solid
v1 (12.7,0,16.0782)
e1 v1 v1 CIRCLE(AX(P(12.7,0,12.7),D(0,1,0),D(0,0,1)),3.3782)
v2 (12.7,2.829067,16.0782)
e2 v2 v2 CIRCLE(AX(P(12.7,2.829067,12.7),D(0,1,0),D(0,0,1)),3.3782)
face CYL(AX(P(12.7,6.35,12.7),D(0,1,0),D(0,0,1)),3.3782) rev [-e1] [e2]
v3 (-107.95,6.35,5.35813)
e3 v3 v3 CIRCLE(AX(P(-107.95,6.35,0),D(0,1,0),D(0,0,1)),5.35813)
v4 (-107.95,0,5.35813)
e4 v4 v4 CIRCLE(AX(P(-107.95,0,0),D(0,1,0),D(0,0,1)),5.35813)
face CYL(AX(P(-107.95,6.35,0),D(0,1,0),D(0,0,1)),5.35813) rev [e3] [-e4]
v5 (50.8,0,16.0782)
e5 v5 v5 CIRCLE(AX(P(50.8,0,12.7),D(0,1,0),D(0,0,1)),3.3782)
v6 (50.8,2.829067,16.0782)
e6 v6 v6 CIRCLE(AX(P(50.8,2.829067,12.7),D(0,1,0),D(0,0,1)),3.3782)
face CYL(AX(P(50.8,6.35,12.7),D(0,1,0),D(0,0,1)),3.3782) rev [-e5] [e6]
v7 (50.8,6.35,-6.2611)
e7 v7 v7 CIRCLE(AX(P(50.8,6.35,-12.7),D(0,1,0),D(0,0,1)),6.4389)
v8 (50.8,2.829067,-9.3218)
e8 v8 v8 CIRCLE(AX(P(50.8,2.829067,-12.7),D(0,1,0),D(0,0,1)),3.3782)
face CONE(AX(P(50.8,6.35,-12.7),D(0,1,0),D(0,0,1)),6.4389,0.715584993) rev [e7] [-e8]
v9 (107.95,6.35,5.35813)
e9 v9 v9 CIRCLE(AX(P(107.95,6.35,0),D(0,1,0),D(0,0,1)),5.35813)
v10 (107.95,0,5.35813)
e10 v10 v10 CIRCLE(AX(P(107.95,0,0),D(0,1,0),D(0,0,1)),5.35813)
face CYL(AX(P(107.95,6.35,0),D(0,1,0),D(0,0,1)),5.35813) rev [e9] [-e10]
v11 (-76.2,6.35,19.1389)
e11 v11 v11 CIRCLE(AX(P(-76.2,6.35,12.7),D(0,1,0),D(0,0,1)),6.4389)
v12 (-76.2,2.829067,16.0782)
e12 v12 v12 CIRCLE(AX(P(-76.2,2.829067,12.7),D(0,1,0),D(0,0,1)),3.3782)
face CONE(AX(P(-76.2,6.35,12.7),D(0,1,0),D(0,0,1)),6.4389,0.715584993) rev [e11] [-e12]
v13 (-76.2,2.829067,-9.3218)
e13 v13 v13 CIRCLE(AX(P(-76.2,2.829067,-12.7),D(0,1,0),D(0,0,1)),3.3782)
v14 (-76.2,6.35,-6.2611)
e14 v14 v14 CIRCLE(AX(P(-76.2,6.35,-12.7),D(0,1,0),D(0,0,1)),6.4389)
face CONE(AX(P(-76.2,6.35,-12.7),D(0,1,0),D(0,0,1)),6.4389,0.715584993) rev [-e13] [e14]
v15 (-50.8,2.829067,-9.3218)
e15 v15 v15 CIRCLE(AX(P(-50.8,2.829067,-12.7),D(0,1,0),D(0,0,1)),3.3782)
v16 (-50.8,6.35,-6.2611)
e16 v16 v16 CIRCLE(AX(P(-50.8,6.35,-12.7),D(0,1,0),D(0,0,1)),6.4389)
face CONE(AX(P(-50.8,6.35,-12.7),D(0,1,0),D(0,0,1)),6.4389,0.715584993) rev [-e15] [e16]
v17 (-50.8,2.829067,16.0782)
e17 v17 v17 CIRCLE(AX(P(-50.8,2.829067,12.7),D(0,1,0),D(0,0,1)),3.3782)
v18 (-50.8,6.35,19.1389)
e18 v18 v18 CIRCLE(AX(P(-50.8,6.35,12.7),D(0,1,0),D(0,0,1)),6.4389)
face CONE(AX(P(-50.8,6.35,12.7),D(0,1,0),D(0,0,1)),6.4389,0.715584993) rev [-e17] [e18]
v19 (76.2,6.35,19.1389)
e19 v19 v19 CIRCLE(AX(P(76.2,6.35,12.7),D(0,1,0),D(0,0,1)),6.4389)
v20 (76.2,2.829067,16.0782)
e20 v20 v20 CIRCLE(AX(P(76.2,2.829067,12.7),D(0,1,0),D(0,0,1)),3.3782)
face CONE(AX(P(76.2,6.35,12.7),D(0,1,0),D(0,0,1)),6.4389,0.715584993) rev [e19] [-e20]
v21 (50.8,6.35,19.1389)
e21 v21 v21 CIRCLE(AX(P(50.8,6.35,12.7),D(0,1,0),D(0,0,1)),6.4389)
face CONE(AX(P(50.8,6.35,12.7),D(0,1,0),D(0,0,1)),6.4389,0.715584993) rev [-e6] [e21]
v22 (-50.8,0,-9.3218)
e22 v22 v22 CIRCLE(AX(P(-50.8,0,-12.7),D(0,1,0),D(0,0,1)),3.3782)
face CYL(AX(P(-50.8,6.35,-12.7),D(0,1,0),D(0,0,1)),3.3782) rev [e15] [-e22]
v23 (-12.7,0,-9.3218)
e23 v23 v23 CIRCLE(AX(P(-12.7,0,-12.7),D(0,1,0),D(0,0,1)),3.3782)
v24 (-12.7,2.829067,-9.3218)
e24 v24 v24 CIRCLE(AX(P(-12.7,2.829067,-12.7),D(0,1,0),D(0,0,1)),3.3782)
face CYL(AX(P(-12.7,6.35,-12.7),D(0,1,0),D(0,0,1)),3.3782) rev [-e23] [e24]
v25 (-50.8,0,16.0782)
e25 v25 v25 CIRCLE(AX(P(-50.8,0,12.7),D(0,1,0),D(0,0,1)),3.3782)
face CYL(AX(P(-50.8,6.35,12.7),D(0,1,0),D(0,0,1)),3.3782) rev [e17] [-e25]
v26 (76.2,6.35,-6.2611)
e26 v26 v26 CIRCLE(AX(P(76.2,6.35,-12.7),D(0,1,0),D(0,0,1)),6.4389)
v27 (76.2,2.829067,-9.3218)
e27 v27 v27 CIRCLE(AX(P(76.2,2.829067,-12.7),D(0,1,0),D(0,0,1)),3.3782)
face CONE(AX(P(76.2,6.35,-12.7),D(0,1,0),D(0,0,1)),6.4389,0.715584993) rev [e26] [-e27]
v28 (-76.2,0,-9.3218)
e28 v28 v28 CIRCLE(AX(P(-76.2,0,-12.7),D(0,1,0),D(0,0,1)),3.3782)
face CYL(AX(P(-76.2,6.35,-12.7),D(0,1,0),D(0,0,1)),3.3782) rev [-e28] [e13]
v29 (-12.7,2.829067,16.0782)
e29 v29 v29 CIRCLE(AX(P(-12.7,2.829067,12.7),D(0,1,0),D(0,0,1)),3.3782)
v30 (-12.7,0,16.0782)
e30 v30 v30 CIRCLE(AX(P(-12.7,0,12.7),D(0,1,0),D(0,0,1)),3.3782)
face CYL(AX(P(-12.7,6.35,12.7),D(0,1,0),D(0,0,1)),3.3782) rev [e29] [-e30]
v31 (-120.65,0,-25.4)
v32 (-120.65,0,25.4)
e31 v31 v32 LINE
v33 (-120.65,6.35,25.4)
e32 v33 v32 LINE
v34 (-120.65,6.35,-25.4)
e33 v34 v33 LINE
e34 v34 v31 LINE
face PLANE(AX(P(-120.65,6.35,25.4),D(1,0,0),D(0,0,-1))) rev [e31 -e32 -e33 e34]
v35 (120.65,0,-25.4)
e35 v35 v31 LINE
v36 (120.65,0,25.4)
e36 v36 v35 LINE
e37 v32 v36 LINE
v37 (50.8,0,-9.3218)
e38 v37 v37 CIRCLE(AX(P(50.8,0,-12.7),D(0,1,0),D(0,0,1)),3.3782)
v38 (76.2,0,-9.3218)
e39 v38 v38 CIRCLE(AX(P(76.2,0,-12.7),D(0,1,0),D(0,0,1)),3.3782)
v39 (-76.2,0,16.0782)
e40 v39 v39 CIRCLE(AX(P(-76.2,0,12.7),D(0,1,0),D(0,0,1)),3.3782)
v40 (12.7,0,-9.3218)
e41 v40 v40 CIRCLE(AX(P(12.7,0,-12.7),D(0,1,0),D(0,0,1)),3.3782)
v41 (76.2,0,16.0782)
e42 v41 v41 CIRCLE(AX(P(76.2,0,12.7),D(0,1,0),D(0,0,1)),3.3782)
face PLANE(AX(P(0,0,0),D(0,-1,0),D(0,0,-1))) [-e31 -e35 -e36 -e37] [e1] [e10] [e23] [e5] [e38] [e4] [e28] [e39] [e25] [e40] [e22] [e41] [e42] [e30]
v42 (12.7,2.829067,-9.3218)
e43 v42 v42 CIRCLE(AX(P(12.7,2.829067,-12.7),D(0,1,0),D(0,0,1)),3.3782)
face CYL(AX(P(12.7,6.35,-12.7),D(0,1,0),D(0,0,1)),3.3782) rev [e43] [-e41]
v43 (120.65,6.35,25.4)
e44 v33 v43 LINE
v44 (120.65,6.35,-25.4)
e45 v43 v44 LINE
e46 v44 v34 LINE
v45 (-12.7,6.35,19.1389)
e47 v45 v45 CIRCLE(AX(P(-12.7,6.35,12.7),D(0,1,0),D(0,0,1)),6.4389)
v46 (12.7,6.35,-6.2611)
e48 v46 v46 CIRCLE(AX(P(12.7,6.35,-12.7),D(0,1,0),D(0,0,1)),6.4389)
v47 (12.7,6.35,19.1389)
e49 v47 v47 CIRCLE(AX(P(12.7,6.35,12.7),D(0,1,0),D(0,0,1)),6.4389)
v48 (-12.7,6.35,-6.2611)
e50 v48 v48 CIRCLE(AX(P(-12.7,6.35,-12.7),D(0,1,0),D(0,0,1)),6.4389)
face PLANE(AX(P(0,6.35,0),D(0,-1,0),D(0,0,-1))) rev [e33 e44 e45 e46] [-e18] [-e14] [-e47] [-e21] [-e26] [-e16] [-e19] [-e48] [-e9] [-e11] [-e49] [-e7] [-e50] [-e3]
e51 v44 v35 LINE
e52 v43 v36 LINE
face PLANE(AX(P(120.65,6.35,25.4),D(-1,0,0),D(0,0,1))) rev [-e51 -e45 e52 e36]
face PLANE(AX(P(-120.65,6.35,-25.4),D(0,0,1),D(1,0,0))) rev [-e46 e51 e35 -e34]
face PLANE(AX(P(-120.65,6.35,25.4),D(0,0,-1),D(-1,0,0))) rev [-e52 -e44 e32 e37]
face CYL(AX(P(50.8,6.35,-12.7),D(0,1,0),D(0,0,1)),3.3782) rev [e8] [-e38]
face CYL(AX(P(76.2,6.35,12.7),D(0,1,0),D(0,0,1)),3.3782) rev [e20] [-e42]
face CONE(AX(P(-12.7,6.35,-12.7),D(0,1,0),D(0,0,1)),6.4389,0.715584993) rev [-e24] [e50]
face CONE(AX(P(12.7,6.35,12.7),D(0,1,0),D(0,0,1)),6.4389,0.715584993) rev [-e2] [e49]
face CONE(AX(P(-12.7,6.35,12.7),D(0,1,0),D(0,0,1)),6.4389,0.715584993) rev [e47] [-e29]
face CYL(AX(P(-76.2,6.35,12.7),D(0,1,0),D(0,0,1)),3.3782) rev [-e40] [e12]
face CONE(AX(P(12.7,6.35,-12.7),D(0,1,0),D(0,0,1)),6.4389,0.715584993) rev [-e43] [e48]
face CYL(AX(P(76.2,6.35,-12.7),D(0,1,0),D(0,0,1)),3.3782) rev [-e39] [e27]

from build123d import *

# Parameters (mm, degrees)
SKETCH1_W               = 241.3
SKETCH1_H               = 50.8
BOSS_EXTRUDE1_DEPTH     = 6.35
F_1_2_13_TAPPED_HOLE1_D = 10.71626


# Read off the part's stored shape, not the designer's step: CSK for 1/4 Flat Head Machine Screw1
with BuildPart() as part:
    # Sketch1 → Boss-Extrude1 (new body)
    with BuildSketch(Plane(origin=(0, 0, 0), x_dir=(1, 0, 0), z_dir=(0, 1, 0))):
        Rectangle(SKETCH1_W, SKETCH1_H)
    extrude(amount=BOSS_EXTRUDE1_DEPTH)

    # CSK for 1/4 Flat Head Machine Screw1 out → CSK for 1/4 Flat Head Machine Screw1 (revolve, cut)
    with BuildSketch(Plane(origin=(76.2, 0, 12.7), x_dir=(1, 0, 0), z_dir=(0, 0, 1))):
        Polygon((0, 0), (3.3782, 0), (3.3782, 2.829067416), (6.4389, 6.35), (0, 6.35), align=None)
    revolve(axis=Axis((76.2, 0, 12.7), (0, 1, 0)), mode=Mode.SUBTRACT)

    # CSK for 1_4 Flat Head Machine Screw1 2 o → CSK for 1_4 Flat Head Machine Screw1 2 (revolve, cut)
    with BuildSketch(Plane(origin=(50.8, 0, -12.7), x_dir=(1, 0, 0), z_dir=(0, 0, 1))):
        Polygon((0, 0), (3.3782, 0), (3.3782, 2.829067416), (6.4389, 6.35), (0, 6.35), align=None)
    revolve(axis=Axis((50.8, 0, -12.7), (0, 1, 0)), mode=Mode.SUBTRACT)

    # CSK for 1_4 Flat Head Machine Screw1 3 o → CSK for 1_4 Flat Head Machine Screw1 3 (revolve, cut)
    with BuildSketch(Plane(origin=(50.8, 0, 12.7), x_dir=(1, 0, 0), z_dir=(0, 0, 1))):
        Polygon((0, 0), (3.3782, 0), (3.3782, 2.829067416), (6.4389, 6.35), (0, 6.35), align=None)
    revolve(axis=Axis((50.8, 0, 12.7), (0, 1, 0)), mode=Mode.SUBTRACT)

    # CSK for 1_4 Flat Head Machine Screw1 4 o → CSK for 1_4 Flat Head Machine Screw1 4 (revolve, cut)
    with BuildSketch(Plane(origin=(76.2, 0, -12.7), x_dir=(1, 0, 0), z_dir=(0, 0, 1))):
        Polygon((0, 0), (3.3782, 0), (3.3782, 2.829067416), (6.4389, 6.35), (0, 6.35), align=None)
    revolve(axis=Axis((76.2, 0, -12.7), (0, 1, 0)), mode=Mode.SUBTRACT)

    # CSK for 1_4 Flat Head Machine Screw1 5 o → CSK for 1_4 Flat Head Machine Screw1 5 (revolve, cut)
    with BuildSketch(Plane(origin=(-50.8, 0, 12.7), x_dir=(1, 0, 0), z_dir=(0, 0, 1))):
        Polygon((0, 0), (3.3782, 0), (3.3782, 2.829067416), (6.4389, 6.35), (0, 6.35), align=None)
    revolve(axis=Axis((-50.8, 0, 12.7), (0, 1, 0)), mode=Mode.SUBTRACT)

    # CSK for 1_4 Flat Head Machine Screw1 6 o → CSK for 1_4 Flat Head Machine Screw1 6 (revolve, cut)
    with BuildSketch(Plane(origin=(-76.2, 0, -12.7), x_dir=(1, 0, 0), z_dir=(0, 0, 1))):
        Polygon((0, 0), (3.3782, 0), (3.3782, 2.829067416), (6.4389, 6.35), (0, 6.35), align=None)
    revolve(axis=Axis((-76.2, 0, -12.7), (0, 1, 0)), mode=Mode.SUBTRACT)

    # CSK for 1_4 Flat Head Machine Screw1 7 o → CSK for 1_4 Flat Head Machine Screw1 7 (revolve, cut)
    with BuildSketch(Plane(origin=(-76.2, 0, 12.7), x_dir=(1, 0, 0), z_dir=(0, 0, 1))):
        Polygon((0, 0), (3.3782, 0), (3.3782, 2.829067416), (6.4389, 6.35), (0, 6.35), align=None)
    revolve(axis=Axis((-76.2, 0, 12.7), (0, 1, 0)), mode=Mode.SUBTRACT)

    # CSK for 1_4 Flat Head Machine Screw1 8 o → CSK for 1_4 Flat Head Machine Screw1 8 (revolve, cut)
    with BuildSketch(Plane(origin=(-50.8, 0, -12.7), x_dir=(1, 0, 0), z_dir=(0, 0, 1))):
        Polygon((0, 0), (3.3782, 0), (3.3782, 2.829067416), (6.4389, 6.35), (0, 6.35), align=None)
    revolve(axis=Axis((-50.8, 0, -12.7), (0, 1, 0)), mode=Mode.SUBTRACT)

    # CSK for 1_4 Flat Head Machine Screw1 9 o → CSK for 1_4 Flat Head Machine Screw1 9 (revolve, cut)
    with BuildSketch(Plane(origin=(12.7, 0, 12.7), x_dir=(1, 0, 0), z_dir=(0, 0, 1))):
        Polygon((0, 0), (3.3782, 0), (3.3782, 2.829067416), (6.4389, 6.35), (0, 6.35), align=None)
    revolve(axis=Axis((12.7, 0, 12.7), (0, 1, 0)), mode=Mode.SUBTRACT)

    # CSK for 1_4 Flat Head Machine Screw1 11 → CSK for 1_4 Flat Head Machine Screw1 10 (revolve, cut)
    with BuildSketch(Plane(origin=(-12.7, 0, -12.7), x_dir=(1, 0, 0), z_dir=(0, 0, 1))):
        Polygon((0, 0), (3.3782, 0), (3.3782, 2.829067416), (6.4389, 6.35), (0, 6.35), align=None)
    revolve(axis=Axis((-12.7, 0, -12.7), (0, 1, 0)), mode=Mode.SUBTRACT)

    # CSK for 1_4 Flat Head Machine Screw1 13 → CSK for 1_4 Flat Head Machine Screw1 12 (revolve, cut)
    with BuildSketch(Plane(origin=(-12.7, 0, 12.7), x_dir=(1, 0, 0), z_dir=(0, 0, 1))):
        Polygon((0, 0), (3.3782, 0), (3.3782, 2.829067416), (6.4389, 6.35), (0, 6.35), align=None)
    revolve(axis=Axis((-12.7, 0, 12.7), (0, 1, 0)), mode=Mode.SUBTRACT)

    # CSK for 1_4 Flat Head Machine Screw1 15 → CSK for 1_4 Flat Head Machine Screw1 14 (revolve, cut)
    with BuildSketch(Plane(origin=(12.7, 0, -12.7), x_dir=(1, 0, 0), z_dir=(0, 0, 1))):
        Polygon((0, 0), (3.3782, 0), (3.3782, 2.829067416), (6.4389, 6.35), (0, 6.35), align=None)
    revolve(axis=Axis((12.7, 0, -12.7), (0, 1, 0)), mode=Mode.SUBTRACT)

    # 1/2-13 Tapped Hole1 (through all)
    with Locations(Plane(origin=(0, 6.35, 0), x_dir=(1, 0, 0), z_dir=(0, 1, 0))):
        with Locations((-107.95, 0), (107.95, 0)):
            Hole(F_1_2_13_TAPPED_HOLE1_D / 2)


solid = part.part
